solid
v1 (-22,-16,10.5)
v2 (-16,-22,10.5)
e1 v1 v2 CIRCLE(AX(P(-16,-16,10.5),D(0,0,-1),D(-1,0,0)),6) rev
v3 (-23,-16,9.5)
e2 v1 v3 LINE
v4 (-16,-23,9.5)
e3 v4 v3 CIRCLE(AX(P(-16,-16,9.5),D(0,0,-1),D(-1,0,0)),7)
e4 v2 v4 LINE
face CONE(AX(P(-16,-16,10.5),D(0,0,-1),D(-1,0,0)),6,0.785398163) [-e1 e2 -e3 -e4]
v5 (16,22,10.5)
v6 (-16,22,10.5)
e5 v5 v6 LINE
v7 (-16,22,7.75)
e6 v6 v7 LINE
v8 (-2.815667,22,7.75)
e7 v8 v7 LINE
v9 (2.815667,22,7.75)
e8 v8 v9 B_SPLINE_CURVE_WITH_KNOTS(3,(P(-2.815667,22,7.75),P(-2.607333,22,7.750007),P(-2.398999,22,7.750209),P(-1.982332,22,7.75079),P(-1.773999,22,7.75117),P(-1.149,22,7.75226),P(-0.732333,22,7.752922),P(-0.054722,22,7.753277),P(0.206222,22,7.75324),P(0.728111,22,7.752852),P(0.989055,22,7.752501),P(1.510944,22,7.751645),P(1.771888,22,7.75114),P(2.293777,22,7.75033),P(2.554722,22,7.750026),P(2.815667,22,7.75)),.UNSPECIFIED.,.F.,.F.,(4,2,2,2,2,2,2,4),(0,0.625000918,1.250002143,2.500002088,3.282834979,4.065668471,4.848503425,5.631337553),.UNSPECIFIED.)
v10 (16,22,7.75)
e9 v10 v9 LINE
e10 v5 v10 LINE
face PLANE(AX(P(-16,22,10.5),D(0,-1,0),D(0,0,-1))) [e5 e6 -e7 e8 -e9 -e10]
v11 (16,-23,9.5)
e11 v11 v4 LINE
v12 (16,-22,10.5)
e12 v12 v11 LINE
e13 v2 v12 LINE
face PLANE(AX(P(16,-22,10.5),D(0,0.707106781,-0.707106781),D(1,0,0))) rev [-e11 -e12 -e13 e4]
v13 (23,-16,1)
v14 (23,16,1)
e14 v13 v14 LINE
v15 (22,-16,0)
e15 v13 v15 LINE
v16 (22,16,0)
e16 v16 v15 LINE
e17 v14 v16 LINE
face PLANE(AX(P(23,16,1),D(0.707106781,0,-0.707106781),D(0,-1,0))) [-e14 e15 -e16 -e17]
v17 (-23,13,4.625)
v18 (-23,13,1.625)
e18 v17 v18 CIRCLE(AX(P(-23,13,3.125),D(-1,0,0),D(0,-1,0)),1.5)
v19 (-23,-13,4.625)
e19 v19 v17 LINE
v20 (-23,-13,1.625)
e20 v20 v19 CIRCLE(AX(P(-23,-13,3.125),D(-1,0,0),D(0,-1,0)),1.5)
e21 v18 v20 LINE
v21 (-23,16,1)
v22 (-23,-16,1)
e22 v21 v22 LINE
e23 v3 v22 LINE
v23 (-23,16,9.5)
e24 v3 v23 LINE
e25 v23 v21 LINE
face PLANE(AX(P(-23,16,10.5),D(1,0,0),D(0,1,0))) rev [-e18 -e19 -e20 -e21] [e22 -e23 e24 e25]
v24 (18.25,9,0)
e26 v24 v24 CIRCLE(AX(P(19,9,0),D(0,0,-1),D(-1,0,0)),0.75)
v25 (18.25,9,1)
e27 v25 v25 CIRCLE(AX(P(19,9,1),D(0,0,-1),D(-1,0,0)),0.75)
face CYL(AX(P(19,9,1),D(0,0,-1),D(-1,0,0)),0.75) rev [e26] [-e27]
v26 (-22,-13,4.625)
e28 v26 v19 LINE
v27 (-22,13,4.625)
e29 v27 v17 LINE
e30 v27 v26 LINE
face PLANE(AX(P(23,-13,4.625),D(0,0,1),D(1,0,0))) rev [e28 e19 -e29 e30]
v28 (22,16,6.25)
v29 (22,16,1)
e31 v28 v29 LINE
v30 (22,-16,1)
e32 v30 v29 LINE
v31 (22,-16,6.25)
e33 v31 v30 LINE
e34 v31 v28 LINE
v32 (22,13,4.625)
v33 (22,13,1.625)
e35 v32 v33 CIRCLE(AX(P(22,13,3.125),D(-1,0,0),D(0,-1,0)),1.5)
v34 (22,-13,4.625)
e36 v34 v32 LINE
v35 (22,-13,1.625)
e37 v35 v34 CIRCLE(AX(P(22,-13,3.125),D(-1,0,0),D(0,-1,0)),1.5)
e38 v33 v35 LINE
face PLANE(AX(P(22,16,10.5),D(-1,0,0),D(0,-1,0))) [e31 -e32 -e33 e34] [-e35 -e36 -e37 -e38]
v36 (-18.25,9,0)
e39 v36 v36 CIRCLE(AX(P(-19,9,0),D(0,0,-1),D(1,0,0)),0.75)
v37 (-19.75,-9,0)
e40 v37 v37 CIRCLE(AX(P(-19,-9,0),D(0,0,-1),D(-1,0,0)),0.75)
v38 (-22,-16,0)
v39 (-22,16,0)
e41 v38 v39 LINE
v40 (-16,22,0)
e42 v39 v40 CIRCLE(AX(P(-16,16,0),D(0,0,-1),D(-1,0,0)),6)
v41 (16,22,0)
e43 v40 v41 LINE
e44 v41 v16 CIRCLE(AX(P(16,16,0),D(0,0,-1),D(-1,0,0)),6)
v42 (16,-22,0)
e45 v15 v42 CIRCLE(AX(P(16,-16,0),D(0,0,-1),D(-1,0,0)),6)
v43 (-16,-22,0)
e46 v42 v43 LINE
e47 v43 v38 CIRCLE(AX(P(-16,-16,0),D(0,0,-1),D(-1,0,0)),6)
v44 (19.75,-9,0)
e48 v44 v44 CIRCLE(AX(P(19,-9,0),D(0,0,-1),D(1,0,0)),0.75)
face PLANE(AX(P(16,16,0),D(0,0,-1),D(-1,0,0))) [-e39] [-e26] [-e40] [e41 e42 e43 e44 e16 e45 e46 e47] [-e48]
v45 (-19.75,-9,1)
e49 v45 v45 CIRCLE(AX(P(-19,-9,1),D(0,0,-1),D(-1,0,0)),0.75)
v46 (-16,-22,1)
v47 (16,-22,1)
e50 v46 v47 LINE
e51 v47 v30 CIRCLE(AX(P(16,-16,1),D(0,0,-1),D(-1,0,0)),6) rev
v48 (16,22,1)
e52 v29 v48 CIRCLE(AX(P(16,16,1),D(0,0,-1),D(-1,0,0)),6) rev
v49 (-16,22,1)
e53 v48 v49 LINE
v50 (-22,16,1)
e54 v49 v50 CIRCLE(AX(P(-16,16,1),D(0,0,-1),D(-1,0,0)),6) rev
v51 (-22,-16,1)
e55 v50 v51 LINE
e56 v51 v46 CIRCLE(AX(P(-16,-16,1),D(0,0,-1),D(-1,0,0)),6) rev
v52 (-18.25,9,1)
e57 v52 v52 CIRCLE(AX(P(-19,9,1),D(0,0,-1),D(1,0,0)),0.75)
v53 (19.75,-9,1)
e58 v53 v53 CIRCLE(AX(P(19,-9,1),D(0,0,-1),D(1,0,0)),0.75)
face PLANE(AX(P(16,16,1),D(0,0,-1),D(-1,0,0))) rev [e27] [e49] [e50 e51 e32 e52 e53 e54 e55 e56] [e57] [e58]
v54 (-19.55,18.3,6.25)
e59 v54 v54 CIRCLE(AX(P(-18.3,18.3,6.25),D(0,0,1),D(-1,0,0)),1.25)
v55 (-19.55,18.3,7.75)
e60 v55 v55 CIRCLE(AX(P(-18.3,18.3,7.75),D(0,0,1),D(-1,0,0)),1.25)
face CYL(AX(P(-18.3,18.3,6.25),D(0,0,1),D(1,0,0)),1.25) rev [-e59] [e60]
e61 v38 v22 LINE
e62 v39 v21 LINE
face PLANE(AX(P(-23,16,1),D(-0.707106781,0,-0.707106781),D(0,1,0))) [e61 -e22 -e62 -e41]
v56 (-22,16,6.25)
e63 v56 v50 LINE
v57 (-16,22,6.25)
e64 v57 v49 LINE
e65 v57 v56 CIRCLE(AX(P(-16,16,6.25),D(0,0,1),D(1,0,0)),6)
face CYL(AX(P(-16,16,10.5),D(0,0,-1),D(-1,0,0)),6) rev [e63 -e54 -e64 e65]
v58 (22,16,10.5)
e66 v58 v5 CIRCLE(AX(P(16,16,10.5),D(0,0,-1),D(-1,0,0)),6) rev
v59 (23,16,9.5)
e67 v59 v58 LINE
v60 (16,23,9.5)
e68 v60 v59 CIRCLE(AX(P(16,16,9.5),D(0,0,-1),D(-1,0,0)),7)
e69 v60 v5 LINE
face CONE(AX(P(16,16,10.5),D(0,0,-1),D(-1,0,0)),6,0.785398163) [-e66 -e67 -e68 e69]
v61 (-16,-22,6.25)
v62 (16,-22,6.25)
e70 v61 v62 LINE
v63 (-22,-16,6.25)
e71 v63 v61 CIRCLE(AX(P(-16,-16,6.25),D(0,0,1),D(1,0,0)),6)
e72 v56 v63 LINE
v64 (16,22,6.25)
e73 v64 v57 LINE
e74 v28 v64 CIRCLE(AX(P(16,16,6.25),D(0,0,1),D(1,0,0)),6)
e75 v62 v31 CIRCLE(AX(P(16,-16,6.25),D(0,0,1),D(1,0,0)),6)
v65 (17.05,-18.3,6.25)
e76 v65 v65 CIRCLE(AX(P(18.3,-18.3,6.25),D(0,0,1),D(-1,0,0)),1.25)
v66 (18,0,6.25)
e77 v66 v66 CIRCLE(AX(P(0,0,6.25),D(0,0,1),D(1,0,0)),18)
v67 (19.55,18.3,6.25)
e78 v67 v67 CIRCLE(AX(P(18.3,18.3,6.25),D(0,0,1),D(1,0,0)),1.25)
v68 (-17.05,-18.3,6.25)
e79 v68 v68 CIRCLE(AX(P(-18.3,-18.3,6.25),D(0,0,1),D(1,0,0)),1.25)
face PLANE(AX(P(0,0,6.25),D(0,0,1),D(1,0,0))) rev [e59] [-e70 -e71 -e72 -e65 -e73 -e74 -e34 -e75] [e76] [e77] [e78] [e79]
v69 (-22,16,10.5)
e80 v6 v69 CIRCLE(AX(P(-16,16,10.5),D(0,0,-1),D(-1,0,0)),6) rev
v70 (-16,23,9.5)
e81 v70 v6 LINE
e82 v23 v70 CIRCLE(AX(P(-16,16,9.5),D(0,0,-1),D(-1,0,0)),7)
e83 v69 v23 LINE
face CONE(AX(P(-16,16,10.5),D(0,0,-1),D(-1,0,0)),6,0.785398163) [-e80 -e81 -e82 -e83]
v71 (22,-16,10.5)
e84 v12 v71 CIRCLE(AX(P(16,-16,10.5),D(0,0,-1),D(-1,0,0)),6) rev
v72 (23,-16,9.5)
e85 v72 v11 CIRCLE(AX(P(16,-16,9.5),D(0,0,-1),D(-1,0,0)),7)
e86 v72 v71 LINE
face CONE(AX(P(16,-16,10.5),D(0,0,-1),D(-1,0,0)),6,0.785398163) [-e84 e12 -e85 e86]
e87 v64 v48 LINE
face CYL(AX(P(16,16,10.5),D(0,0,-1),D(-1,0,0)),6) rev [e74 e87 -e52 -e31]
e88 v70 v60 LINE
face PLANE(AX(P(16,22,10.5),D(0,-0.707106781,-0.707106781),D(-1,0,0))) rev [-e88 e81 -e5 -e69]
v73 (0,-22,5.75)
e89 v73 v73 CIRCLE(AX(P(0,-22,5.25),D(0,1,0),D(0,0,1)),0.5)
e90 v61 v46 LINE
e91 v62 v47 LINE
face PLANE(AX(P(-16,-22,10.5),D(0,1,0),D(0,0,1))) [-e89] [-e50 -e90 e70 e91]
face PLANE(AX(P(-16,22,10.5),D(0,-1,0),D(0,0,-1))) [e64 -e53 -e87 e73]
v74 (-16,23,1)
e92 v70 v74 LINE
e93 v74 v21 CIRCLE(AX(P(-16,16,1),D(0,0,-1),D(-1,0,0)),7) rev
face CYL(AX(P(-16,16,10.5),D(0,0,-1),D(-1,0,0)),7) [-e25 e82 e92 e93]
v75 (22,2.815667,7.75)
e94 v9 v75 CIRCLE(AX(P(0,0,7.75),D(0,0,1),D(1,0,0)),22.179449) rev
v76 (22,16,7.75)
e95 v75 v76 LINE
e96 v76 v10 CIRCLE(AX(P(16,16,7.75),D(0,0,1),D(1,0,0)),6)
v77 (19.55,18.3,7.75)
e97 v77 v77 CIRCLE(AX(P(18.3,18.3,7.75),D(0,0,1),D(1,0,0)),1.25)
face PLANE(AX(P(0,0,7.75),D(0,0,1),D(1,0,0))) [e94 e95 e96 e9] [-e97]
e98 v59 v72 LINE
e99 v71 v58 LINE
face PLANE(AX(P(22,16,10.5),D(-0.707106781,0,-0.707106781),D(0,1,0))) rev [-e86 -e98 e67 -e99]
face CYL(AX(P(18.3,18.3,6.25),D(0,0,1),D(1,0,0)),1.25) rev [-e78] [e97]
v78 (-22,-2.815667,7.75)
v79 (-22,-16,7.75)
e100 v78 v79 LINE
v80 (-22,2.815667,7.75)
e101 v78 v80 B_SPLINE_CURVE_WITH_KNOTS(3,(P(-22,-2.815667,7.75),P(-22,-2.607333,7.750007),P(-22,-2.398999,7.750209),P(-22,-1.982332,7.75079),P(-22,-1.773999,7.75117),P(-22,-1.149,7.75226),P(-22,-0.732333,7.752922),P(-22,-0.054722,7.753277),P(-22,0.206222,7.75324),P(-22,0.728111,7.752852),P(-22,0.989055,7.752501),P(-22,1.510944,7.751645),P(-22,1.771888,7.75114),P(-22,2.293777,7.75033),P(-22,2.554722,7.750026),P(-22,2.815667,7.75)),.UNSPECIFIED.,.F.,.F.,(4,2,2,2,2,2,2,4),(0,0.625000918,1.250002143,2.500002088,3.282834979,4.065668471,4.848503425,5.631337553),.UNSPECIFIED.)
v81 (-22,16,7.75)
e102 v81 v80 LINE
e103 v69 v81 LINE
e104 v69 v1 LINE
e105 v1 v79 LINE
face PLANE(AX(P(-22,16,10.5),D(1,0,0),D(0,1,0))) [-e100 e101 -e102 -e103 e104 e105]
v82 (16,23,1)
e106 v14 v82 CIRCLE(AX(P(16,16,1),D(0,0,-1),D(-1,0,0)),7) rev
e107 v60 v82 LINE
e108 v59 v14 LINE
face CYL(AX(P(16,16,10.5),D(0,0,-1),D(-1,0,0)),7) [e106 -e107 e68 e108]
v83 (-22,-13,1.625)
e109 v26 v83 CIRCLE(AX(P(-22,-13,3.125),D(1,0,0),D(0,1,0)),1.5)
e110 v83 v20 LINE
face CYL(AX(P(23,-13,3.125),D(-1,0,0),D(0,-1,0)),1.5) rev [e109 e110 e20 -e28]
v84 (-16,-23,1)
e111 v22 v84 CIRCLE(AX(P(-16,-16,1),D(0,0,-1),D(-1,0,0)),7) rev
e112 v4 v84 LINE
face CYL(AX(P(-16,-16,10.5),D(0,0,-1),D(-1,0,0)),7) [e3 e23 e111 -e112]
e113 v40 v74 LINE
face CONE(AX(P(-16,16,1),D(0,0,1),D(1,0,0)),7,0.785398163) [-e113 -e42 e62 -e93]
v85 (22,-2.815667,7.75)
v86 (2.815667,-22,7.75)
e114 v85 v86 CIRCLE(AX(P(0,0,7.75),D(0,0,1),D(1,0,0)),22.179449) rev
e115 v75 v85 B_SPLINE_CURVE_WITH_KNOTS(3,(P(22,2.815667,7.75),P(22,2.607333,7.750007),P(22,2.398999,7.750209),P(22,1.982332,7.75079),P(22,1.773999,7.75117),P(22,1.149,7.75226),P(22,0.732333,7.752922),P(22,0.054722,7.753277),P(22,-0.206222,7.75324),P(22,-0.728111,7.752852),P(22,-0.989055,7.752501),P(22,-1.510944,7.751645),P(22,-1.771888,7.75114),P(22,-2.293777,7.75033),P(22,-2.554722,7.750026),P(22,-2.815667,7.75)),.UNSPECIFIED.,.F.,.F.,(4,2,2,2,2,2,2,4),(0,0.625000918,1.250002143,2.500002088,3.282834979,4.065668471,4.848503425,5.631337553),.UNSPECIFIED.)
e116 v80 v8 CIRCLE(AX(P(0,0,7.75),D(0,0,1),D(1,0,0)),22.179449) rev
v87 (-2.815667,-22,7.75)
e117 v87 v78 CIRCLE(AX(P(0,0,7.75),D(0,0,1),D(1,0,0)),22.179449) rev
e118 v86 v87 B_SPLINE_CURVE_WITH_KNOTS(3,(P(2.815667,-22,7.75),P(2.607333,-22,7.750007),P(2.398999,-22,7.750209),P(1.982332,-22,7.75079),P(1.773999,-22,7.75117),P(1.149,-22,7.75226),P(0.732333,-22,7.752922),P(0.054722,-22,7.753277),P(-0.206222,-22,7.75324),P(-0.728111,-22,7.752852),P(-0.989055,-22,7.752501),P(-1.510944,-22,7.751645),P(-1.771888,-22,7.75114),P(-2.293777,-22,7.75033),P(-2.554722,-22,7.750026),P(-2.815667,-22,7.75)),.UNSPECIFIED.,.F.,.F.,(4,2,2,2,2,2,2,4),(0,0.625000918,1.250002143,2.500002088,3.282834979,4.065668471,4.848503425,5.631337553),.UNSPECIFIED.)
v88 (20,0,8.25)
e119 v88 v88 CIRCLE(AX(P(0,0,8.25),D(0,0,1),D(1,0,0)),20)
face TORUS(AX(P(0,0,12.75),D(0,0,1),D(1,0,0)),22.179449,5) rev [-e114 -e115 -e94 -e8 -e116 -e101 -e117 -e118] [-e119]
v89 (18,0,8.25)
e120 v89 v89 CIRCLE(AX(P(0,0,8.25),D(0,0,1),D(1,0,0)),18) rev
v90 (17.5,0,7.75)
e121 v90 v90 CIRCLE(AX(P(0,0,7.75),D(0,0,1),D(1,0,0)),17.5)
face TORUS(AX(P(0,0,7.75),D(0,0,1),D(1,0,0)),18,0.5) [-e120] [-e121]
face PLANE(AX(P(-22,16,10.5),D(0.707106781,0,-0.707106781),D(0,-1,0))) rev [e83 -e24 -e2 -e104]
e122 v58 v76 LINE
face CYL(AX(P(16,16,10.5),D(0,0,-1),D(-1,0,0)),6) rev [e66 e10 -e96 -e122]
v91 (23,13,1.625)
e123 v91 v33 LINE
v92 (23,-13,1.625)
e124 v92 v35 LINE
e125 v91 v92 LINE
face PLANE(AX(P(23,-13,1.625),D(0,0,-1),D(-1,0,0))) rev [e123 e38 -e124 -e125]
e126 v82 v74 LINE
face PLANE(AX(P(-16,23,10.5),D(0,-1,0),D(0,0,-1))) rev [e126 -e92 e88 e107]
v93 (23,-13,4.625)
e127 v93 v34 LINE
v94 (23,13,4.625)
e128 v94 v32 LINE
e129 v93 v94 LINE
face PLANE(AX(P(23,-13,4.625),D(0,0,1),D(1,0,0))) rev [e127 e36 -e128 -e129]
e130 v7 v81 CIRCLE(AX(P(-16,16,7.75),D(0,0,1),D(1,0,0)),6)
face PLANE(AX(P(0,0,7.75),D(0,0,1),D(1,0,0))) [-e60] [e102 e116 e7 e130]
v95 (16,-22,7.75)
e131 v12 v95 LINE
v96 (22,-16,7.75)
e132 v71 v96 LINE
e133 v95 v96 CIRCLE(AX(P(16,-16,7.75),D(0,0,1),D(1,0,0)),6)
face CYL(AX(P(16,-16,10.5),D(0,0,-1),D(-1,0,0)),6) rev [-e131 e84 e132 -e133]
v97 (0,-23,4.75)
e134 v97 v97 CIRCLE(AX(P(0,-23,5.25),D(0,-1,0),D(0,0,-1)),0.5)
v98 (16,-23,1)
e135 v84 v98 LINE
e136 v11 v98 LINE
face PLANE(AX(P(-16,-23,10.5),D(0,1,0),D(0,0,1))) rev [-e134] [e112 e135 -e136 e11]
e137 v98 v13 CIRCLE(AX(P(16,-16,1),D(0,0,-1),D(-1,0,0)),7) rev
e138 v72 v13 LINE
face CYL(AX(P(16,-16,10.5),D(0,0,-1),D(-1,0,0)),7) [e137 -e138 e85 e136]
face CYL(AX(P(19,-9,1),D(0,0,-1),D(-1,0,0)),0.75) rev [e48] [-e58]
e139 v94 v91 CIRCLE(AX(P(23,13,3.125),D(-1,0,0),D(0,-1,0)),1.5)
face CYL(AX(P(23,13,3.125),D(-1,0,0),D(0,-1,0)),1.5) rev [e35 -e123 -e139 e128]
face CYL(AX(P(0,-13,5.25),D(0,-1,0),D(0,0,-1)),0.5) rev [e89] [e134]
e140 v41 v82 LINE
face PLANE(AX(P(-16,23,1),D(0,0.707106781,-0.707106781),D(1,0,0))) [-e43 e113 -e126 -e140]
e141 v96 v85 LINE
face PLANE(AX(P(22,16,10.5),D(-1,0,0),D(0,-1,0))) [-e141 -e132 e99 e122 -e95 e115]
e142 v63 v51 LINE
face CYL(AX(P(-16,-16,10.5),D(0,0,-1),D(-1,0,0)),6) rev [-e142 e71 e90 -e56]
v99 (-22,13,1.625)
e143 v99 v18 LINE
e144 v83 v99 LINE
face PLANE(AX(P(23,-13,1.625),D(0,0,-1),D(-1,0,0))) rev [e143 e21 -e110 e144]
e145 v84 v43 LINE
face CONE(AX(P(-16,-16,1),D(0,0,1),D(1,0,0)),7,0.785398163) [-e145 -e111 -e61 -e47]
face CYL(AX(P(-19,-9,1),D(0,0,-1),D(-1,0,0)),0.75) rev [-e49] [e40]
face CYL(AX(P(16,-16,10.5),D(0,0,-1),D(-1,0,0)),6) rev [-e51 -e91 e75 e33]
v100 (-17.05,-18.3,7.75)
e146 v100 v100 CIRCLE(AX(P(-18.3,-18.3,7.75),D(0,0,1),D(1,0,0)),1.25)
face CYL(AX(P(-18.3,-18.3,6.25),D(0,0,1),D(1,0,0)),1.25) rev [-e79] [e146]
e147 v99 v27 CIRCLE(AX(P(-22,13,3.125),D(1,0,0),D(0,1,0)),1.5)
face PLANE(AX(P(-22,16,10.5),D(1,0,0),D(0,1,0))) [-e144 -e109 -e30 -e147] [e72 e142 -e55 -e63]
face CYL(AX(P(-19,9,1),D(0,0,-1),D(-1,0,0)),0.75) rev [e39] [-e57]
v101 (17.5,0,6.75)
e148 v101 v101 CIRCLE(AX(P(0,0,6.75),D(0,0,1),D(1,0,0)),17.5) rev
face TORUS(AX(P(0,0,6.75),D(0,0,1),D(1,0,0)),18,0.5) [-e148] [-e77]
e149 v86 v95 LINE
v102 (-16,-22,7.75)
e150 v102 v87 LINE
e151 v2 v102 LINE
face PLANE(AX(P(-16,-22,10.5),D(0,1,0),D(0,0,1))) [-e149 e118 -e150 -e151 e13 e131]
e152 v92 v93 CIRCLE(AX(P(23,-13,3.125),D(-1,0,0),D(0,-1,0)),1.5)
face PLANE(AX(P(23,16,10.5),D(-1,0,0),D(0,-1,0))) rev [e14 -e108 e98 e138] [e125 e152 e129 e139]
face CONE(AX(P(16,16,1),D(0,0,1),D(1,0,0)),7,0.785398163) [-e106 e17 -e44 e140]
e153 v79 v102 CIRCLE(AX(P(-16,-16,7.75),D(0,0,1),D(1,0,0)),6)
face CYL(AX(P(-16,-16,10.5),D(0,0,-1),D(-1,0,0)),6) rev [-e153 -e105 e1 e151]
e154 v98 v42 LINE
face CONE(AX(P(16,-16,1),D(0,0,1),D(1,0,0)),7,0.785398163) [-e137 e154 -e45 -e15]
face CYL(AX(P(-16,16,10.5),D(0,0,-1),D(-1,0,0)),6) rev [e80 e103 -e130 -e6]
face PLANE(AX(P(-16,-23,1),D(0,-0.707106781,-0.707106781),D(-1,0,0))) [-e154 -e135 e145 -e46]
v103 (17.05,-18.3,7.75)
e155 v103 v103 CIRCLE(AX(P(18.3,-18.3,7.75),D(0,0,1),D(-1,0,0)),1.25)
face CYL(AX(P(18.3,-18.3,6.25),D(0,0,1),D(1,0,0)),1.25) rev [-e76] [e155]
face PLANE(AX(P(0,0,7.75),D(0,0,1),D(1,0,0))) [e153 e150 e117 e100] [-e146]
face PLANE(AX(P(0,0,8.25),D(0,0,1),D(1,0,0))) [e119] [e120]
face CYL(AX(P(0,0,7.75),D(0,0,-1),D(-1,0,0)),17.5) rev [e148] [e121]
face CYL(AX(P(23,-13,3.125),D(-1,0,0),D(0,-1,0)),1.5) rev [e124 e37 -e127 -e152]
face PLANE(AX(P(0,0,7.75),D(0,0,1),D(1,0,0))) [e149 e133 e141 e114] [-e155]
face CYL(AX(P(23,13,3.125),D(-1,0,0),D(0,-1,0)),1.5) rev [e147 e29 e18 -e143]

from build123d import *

# Parameters (mm, degrees)
SALIENTE_EXTRUIR2_DEPTH = 10.5
VACIADO1_T              = -1
CROQUIS4_R              = 20
CROQUIS4_R_2            = 17.5
SALIENTE_EXTRUIR3_DEPTH = 1.5
CROQUIS5_R              = 20
CROQUIS5_R_2            = 17.5
SALIENTE_EXTRUIR4_DEPTH = 0.5
REDONDEO1_R             = 5
REDONDEO2_R             = 0.5
CORTAR_EXTRUIR1_DEPTH   = 53.490475346
CHAFL_N1_SIZE           = 1
CHAFL_N2_SIZE           = 1
CROQUIS7_R              = 0.75
CORTAR_EXTRUIR2_DEPTH   = 1
CROQUIS8_R              = 0.5
CORTAR_EXTRUIR3_DEPTH   = 10
CROQUIS9_R              = 1.25
CORTAR_EXTRUIR4_DEPTH   = 1.5


# Some blends are built 0.0001 mm under size
with BuildPart() as part:
    # Croquis3 → Saliente-Extruir2 (new body)
    with BuildSketch(Plane.XY):
        with BuildLine():
            Line((-16, 23), (16, 23))
            ThreePointArc((16, 23), (20.949747468, 20.949747468), (23, 16))
            Line((23, 16), (23, -16))
            ThreePointArc((23, -16), (20.949747468, -20.949747468), (16, -23))
            Line((16, -23), (-16, -23))
            ThreePointArc((-16, -23), (-20.949747468, -20.949747468), (-23, -16))
            Line((-23, -16), (-23, 16))
            ThreePointArc((-23, 16), (-20.949747468, 20.949747468), (-16, 23))
        make_face()
    extrude(amount=SALIENTE_EXTRUIR2_DEPTH)

    # Vaciado1
    vaciado1_openings = [part.faces().sort_by_distance(p)[0] for p in [
        (0, 0, 10.5),
    ]]
    offset(amount=VACIADO1_T, openings=vaciado1_openings, kind=Kind.INTERSECTION)



with BuildPart() as body_2:
    # Croquis4 → Saliente-Extruir3 (new body)
    # profile 1 of 2: a face of its own
    with BuildSketch(Plane.XY.offset(6.25)):
        with BuildLine():
            Line((22, -16), (22, 16))
            ThreePointArc((22, 16), (20.242640687, 20.242640687), (16, 22))
            Line((16, 22), (-16, 22))
            ThreePointArc((-16, 22), (-20.242640687, 20.242640687), (-22, 16))
            Line((-22, 16), (-22, -16))
            ThreePointArc((-22, -16), (-20.242640687, -20.242640687), (-16, -22))
            Line((-16, -22), (16, -22))
            ThreePointArc((16, -22), (20.242640687, -20.242640687), (22, -16))
        make_face()
        Circle(CROQUIS4_R, mode=Mode.SUBTRACT)
    # profile 2 of 2: a face of its own
    with BuildSketch(Plane.XY.offset(6.25)):
        Circle(CROQUIS4_R)
        Circle(CROQUIS4_R_2, mode=Mode.SUBTRACT)
    extrude(amount=SALIENTE_EXTRUIR3_DEPTH)


with BuildPart() as part_1:
    add(part.part)

    add(body_2.part)  # Saliente-Extruir4 merges body 2
    # Croquis5 → Saliente-Extruir4 (add)
    with BuildSketch(Plane.XY.offset(7.75)):
        Circle(CROQUIS5_R)
        Circle(CROQUIS5_R_2, mode=Mode.SUBTRACT)
    extrude(amount=SALIENTE_EXTRUIR4_DEPTH)

    # Redondeo1
    # the kernel refuses this fillet: 5 mm, written as the material it adds along each edge
    with BuildSketch(Plane(origin=(0, 0, 7.75), x_dir=(1, 0, 0), z_dir=(0, -1, 0))) as redondeo1_piece_1:
        with BuildLine():
            CenterArc((22.179449472, 5), REDONDEO1_R, 244.158067237, 25.841932763)
            Line((22.179449472, 0), (22.179449472, -0.1))
            Line((22.179449472, -0.1), (20, -0.1))
            Line((20, -0.1), (19.9, 0))
            ThreePointArc((19.9, 0), (19.9, 0.25), (19.956411011, 0.41))
            Line((19.956411011, 0.41), (20, 0.5))
        make_face()
    revolve(axis=Axis((0, 0, 7.75), (0, 0, 1)))

    # Redondeo2
    redondeo2_edges = [part_1.edges().sort_by_distance(p)[0] for p in [
        (-17.5, 0, 6.25),
        (-17.5, 0, 8.25),
    ]]
    fillet(redondeo2_edges, radius=REDONDEO2_R)

    # Croquis6 → Cortar-Extruir1 (cut, through all)
    with BuildSketch(Plane.ZY.offset(23)):
        with BuildLine():
            Line((1.625, -13), (1.625, 13))
            ThreePointArc((1.625, 13), (3.125, 14.5), (4.625, 13))
            Line((4.625, 13), (4.625, -13))
            ThreePointArc((4.625, -13), (3.125, -14.5), (1.625, -13))
        make_face()
    extrude(amount=-CORTAR_EXTRUIR1_DEPTH, mode=Mode.SUBTRACT)

    # Chaflán1
    chafl_n1_edges = [part_1.edges().sort_by_distance(p)[0] for p in [
        (-20.949747468, 20.949747468, 10.5),
        (-23, 0, 10.5),
        (-20.949747468, -20.949747468, 10.5),
        (0, -23, 10.5),
        (20.949747468, -20.949747468, 10.5),
        (23, 0, 10.5),
        (20.949747468, 20.949747468, 10.5),
        (0, 23, 10.5),
    ]]
    chamfer(chafl_n1_edges, length=CHAFL_N1_SIZE - 0.0001)  # a hair under: the kernel refuses the full size

    # Chaflán2
    chafl_n2_edges = [part_1.edges().sort_by_distance(p)[0] for p in [
        (0, 23, 0),
        (20.949747468, 20.949747468, 0),
        (23, 0, 0),
        (20.949747468, -20.949747468, 0),
        (0, -23, 0),
        (-20.949747468, -20.949747468, 0),
        (-23, 0, 0),
        (-20.949747468, 20.949747468, 0),
    ]]
    chamfer(chafl_n2_edges, length=CHAFL_N2_SIZE)

    # Croquis7 → Cortar-Extruir2 (cut)
    with BuildSketch(Plane(origin=(0, 0, 0), x_dir=(-1, 0, 0), z_dir=(0, 0, -1))):
        with Locations((-19, 9)):
            Circle(CROQUIS7_R)
        with Locations(Location((-19, -9, 0), (0, 0, 180))):
            Circle(CROQUIS7_R)
        with Locations((19, -9)):
            Circle(CROQUIS7_R)
        with Locations(Location((19, 9, 0), (0, 0, 180))):
            Circle(CROQUIS7_R)
    extrude(amount=-CORTAR_EXTRUIR2_DEPTH, mode=Mode.SUBTRACT)

    # Croquis8 → Cortar-Extruir3 (cut)
    with BuildSketch(Plane.XZ.offset(23)):
        with Locations(Location((0, 5.25, 0), (0, 0, 270))):
            Circle(CROQUIS8_R)
    extrude(amount=-CORTAR_EXTRUIR3_DEPTH, mode=Mode.SUBTRACT)

    # Croquis9 → Cortar-Extruir4 (cut)
    with BuildSketch(Plane.XY.offset(7.75)):
        with Locations((18.3, 18.3)):
            Circle(CROQUIS9_R)
        with Locations(Location((-18.3, 18.3, 0), (0, 0, 180))):
            Circle(CROQUIS9_R)
        with Locations((-18.3, -18.3)):
            Circle(CROQUIS9_R)
        with Locations(Location((18.3, -18.3, 0), (0, 0, 180))):
            Circle(CROQUIS9_R)
    extrude(amount=-CORTAR_EXTRUIR4_DEPTH, mode=Mode.SUBTRACT)


solid = part_1.part
